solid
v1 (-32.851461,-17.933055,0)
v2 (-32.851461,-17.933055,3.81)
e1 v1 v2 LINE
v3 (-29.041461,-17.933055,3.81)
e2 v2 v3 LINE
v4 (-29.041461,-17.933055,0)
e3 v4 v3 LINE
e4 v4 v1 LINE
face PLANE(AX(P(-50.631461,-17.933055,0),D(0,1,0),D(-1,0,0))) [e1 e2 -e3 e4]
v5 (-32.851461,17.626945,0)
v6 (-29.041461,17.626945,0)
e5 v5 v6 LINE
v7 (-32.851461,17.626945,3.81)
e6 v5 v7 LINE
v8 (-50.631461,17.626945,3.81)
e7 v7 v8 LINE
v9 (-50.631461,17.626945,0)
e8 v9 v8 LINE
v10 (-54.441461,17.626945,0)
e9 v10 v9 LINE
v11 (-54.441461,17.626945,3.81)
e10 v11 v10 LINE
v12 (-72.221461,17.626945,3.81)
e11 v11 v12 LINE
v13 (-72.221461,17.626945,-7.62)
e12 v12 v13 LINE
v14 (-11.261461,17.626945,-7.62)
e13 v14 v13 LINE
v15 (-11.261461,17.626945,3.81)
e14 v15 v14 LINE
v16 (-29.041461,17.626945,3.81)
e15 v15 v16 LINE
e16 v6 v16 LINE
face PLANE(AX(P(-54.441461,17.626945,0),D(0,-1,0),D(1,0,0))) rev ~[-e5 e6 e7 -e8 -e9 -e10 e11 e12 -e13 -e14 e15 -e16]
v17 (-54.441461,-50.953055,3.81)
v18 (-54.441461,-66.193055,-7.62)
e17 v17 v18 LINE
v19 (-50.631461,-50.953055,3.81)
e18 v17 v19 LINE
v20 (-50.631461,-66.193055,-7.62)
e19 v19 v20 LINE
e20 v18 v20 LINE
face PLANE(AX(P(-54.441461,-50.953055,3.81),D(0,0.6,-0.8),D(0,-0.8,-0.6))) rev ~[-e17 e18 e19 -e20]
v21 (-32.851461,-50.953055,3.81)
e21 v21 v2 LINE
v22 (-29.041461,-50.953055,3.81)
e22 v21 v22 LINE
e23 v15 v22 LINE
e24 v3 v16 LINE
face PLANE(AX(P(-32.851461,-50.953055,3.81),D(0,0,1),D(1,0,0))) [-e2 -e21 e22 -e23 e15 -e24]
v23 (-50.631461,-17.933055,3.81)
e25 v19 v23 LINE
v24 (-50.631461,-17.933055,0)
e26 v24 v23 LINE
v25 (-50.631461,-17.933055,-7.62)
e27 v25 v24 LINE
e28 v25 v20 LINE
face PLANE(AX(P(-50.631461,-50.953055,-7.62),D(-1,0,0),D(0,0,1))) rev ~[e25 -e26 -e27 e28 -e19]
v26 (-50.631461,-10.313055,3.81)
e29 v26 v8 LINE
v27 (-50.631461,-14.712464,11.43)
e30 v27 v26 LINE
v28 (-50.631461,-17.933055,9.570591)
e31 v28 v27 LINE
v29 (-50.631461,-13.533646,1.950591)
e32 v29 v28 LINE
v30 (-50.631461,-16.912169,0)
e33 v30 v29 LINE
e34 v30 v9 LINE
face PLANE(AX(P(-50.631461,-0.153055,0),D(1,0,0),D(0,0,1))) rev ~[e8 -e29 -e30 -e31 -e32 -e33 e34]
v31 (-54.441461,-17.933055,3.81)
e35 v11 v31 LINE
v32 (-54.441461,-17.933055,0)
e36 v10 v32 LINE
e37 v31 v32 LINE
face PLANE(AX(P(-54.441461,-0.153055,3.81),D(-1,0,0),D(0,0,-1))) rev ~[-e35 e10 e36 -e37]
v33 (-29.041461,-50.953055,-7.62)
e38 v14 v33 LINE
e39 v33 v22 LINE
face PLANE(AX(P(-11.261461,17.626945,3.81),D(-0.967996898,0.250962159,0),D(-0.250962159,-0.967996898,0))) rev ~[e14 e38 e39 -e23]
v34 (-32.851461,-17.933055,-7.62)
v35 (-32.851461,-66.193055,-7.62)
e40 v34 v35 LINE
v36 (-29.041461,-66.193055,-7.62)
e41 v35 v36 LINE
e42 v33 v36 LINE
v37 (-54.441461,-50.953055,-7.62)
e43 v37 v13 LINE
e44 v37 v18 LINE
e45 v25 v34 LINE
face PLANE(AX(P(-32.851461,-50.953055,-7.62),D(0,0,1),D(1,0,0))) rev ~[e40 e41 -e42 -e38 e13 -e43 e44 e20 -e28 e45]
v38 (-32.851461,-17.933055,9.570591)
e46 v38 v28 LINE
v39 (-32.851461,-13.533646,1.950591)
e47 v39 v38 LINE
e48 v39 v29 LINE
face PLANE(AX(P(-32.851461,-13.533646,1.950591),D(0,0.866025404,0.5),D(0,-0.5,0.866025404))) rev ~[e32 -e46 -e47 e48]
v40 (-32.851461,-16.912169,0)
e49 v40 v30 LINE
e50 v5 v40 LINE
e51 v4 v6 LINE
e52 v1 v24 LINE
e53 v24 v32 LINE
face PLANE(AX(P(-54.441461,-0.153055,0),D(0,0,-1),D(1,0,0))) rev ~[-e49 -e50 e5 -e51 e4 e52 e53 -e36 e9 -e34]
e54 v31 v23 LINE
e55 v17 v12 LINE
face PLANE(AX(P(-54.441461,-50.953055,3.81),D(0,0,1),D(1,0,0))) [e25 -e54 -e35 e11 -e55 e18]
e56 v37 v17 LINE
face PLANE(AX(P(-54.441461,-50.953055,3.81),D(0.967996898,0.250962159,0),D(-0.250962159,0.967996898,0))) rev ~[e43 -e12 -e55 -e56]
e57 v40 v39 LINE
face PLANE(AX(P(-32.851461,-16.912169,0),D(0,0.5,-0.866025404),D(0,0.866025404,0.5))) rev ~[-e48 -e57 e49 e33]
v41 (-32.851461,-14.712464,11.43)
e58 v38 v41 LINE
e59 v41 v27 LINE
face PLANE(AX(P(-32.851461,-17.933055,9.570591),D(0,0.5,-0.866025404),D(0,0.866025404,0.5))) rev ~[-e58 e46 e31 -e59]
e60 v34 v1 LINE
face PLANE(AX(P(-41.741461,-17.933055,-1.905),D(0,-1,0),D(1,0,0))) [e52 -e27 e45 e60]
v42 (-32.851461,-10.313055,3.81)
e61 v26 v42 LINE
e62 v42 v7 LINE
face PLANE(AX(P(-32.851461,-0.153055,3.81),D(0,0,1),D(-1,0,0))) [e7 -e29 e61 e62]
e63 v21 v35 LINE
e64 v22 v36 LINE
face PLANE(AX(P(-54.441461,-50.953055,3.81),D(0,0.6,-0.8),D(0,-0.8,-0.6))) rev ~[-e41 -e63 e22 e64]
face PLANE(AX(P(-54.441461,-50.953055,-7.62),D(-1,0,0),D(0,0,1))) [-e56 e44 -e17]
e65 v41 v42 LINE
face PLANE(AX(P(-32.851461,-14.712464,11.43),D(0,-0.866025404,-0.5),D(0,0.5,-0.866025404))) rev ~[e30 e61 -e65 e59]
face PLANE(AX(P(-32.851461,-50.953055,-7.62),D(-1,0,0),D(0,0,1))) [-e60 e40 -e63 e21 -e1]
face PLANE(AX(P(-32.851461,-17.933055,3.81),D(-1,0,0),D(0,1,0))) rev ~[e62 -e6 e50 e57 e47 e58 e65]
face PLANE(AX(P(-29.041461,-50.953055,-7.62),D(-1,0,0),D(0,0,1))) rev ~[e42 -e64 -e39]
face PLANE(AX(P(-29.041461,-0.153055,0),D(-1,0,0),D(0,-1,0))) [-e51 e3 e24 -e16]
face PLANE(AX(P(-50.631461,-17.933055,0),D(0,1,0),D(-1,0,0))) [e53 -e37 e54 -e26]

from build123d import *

# Parameters (mm, degrees)
F1_DEPTH      = 3.81
F1_DEPTH_BACK = 7.62
F0_W          = 3.81
F0_H          = 17.78
F2_DEPTH      = 7.62
F3_W          = 17.78
F3_H          = 7.62
F4_DEPTH      = 7.62
F6_DEPTH      = 17.78
F7_W          = 17.78
F7_H          = 11.43
F8_DEPTH      = 33.02
F9_DEPTH      = 17.78
F10_W         = 3.81
F10_H         = 11.43
F11_DEPTH     = 15.24
F12_W         = 3.81
F12_H         = 11.43
F13_DEPTH     = 15.24
F15_DEPTH     = 25.4
F18_DEPTH     = 25.4


# Not quite as in the source:
# - a feature names something its author has since deleted; it is built from what else it names


with BuildPart() as f1:
    # F0 (on Top) → F1 (new body, two sides)
    with BuildSketch(Plane.XY) as f1_sk:
        Polygon((-54.4414605618, -0.1530551207), (-79.8414605618, -0.1530551207), (-79.8414605618, -50.9530551207), (-3.6414605618, -50.9530551207), (-3.6414605618, -0.1530551207), (-29.0414605618, -0.1530551207), (-29.0414605618, -17.9330551207), (-32.8514605618, -17.9330551207), (-32.8514605618, -0.1530551207), (-50.6314605618, -0.1530551207), (-50.6314605618, -17.9330551207), (-54.4414605618, -17.9330551207), align=None)
    extrude(amount=F1_DEPTH)
    extrude(f1_sk.sketch, amount=-F1_DEPTH_BACK)

    # F0 (on Top) → F2 (join)
    with BuildSketch(Plane.XY):
        with Locations((-52.5364605618, -9.0430551207)):
            Rectangle(F0_W, F0_H)
        with Locations((-30.9464605618, -9.0430551207)):
            Rectangle(F0_W, F0_H)
    extrude(amount=-F2_DEPTH)

    # F3 (on face) → F4 (join)
    with BuildSketch(Plane.XY.offset(3.81)):
        with Locations((-41.7414605618, -14.1230551207)):
            Rectangle(F3_W, F3_H)
    extrude(amount=F4_DEPTH)

    # F5 (on face) → F6 (cut)
    with BuildSketch(Plane.YZ.offset(-32.8514605618)):
        Polygon((-14.7124641719, 11.43), (-10.3130551207, 3.81), (-10.3130551207, 11.43), align=None)
        Polygon((-17.9330551207, 9.5705909488), (-14.7124641719, 11.43), (-17.9330551207, 11.43), align=None)
        Polygon((-16.9121686975, 0), (-13.5336460694, 1.9505909488), (-17.9330551207, 9.5705909488), (-17.9330551207, 3.81), (-17.9330551207, 0), align=None)
    extrude(amount=-F6_DEPTH, mode=Mode.SUBTRACT)

    # F7 (on face) → F8 (cut)
    with BuildSketch(Plane.XZ.offset(50.9530551207)):
        with Locations((-41.7414605618, -1.905)):
            Rectangle(F7_W, F7_H)
    extrude(amount=-F8_DEPTH, mode=Mode.SUBTRACT)

    # F9 (add): a face of the model
    f9_faces = [f1.faces().sort_by_distance(p)[0] for p in [
        (-41.7414605618, -0.1530551207, -2.0363793103),
    ]]
    extrude(f9_faces, amount=F9_DEPTH)

    # F10 (on face) → F11 (join)
    with BuildSketch(Plane.XZ.offset(50.9530551207)):
        with Locations((-52.5364605618, -1.905)):
            Rectangle(F10_W, F10_H)
    extrude(amount=F11_DEPTH)

    # F12 (on face) → F13 (join)
    with BuildSketch(Plane.XZ.offset(50.9530551207)):
        with Locations((-30.9464605618, -1.905)):
            Rectangle(F12_W, F12_H)
    extrude(amount=F13_DEPTH)

    # F14 (on face) → F15 (cut)
    with BuildSketch(Plane(origin=(-54.4414605618, 0, 0), x_dir=(0, -1, 0), z_dir=(-1, 0, 0))):
        Polygon((66.1930551207, 3.81), (50.9530551207, 3.81), (66.1930551207, -7.62), align=None)
    extrude(amount=-F15_DEPTH, mode=Mode.SUBTRACT)

    # F16 (on face) + F17 (on face) → F18 (cut)
    with BuildSketch(Plane.XY.offset(3.81)):
        Polygon((-54.4414605618, -50.9530551207), (-72.2214605618, 17.6269448793), (-79.8414605618, 17.6269448793), (-79.8414605618, -50.9530551207), align=None)
    with BuildSketch(Plane.XY.offset(3.81)):
        Polygon((-3.6414605618, 17.6269448793), (-11.2614605618, 17.6269448793), (-29.0414605618, -50.9530551207), (-3.6414605618, -50.9530551207), align=None)
    extrude(amount=-F18_DEPTH, mode=Mode.SUBTRACT)


solid = f1.part
